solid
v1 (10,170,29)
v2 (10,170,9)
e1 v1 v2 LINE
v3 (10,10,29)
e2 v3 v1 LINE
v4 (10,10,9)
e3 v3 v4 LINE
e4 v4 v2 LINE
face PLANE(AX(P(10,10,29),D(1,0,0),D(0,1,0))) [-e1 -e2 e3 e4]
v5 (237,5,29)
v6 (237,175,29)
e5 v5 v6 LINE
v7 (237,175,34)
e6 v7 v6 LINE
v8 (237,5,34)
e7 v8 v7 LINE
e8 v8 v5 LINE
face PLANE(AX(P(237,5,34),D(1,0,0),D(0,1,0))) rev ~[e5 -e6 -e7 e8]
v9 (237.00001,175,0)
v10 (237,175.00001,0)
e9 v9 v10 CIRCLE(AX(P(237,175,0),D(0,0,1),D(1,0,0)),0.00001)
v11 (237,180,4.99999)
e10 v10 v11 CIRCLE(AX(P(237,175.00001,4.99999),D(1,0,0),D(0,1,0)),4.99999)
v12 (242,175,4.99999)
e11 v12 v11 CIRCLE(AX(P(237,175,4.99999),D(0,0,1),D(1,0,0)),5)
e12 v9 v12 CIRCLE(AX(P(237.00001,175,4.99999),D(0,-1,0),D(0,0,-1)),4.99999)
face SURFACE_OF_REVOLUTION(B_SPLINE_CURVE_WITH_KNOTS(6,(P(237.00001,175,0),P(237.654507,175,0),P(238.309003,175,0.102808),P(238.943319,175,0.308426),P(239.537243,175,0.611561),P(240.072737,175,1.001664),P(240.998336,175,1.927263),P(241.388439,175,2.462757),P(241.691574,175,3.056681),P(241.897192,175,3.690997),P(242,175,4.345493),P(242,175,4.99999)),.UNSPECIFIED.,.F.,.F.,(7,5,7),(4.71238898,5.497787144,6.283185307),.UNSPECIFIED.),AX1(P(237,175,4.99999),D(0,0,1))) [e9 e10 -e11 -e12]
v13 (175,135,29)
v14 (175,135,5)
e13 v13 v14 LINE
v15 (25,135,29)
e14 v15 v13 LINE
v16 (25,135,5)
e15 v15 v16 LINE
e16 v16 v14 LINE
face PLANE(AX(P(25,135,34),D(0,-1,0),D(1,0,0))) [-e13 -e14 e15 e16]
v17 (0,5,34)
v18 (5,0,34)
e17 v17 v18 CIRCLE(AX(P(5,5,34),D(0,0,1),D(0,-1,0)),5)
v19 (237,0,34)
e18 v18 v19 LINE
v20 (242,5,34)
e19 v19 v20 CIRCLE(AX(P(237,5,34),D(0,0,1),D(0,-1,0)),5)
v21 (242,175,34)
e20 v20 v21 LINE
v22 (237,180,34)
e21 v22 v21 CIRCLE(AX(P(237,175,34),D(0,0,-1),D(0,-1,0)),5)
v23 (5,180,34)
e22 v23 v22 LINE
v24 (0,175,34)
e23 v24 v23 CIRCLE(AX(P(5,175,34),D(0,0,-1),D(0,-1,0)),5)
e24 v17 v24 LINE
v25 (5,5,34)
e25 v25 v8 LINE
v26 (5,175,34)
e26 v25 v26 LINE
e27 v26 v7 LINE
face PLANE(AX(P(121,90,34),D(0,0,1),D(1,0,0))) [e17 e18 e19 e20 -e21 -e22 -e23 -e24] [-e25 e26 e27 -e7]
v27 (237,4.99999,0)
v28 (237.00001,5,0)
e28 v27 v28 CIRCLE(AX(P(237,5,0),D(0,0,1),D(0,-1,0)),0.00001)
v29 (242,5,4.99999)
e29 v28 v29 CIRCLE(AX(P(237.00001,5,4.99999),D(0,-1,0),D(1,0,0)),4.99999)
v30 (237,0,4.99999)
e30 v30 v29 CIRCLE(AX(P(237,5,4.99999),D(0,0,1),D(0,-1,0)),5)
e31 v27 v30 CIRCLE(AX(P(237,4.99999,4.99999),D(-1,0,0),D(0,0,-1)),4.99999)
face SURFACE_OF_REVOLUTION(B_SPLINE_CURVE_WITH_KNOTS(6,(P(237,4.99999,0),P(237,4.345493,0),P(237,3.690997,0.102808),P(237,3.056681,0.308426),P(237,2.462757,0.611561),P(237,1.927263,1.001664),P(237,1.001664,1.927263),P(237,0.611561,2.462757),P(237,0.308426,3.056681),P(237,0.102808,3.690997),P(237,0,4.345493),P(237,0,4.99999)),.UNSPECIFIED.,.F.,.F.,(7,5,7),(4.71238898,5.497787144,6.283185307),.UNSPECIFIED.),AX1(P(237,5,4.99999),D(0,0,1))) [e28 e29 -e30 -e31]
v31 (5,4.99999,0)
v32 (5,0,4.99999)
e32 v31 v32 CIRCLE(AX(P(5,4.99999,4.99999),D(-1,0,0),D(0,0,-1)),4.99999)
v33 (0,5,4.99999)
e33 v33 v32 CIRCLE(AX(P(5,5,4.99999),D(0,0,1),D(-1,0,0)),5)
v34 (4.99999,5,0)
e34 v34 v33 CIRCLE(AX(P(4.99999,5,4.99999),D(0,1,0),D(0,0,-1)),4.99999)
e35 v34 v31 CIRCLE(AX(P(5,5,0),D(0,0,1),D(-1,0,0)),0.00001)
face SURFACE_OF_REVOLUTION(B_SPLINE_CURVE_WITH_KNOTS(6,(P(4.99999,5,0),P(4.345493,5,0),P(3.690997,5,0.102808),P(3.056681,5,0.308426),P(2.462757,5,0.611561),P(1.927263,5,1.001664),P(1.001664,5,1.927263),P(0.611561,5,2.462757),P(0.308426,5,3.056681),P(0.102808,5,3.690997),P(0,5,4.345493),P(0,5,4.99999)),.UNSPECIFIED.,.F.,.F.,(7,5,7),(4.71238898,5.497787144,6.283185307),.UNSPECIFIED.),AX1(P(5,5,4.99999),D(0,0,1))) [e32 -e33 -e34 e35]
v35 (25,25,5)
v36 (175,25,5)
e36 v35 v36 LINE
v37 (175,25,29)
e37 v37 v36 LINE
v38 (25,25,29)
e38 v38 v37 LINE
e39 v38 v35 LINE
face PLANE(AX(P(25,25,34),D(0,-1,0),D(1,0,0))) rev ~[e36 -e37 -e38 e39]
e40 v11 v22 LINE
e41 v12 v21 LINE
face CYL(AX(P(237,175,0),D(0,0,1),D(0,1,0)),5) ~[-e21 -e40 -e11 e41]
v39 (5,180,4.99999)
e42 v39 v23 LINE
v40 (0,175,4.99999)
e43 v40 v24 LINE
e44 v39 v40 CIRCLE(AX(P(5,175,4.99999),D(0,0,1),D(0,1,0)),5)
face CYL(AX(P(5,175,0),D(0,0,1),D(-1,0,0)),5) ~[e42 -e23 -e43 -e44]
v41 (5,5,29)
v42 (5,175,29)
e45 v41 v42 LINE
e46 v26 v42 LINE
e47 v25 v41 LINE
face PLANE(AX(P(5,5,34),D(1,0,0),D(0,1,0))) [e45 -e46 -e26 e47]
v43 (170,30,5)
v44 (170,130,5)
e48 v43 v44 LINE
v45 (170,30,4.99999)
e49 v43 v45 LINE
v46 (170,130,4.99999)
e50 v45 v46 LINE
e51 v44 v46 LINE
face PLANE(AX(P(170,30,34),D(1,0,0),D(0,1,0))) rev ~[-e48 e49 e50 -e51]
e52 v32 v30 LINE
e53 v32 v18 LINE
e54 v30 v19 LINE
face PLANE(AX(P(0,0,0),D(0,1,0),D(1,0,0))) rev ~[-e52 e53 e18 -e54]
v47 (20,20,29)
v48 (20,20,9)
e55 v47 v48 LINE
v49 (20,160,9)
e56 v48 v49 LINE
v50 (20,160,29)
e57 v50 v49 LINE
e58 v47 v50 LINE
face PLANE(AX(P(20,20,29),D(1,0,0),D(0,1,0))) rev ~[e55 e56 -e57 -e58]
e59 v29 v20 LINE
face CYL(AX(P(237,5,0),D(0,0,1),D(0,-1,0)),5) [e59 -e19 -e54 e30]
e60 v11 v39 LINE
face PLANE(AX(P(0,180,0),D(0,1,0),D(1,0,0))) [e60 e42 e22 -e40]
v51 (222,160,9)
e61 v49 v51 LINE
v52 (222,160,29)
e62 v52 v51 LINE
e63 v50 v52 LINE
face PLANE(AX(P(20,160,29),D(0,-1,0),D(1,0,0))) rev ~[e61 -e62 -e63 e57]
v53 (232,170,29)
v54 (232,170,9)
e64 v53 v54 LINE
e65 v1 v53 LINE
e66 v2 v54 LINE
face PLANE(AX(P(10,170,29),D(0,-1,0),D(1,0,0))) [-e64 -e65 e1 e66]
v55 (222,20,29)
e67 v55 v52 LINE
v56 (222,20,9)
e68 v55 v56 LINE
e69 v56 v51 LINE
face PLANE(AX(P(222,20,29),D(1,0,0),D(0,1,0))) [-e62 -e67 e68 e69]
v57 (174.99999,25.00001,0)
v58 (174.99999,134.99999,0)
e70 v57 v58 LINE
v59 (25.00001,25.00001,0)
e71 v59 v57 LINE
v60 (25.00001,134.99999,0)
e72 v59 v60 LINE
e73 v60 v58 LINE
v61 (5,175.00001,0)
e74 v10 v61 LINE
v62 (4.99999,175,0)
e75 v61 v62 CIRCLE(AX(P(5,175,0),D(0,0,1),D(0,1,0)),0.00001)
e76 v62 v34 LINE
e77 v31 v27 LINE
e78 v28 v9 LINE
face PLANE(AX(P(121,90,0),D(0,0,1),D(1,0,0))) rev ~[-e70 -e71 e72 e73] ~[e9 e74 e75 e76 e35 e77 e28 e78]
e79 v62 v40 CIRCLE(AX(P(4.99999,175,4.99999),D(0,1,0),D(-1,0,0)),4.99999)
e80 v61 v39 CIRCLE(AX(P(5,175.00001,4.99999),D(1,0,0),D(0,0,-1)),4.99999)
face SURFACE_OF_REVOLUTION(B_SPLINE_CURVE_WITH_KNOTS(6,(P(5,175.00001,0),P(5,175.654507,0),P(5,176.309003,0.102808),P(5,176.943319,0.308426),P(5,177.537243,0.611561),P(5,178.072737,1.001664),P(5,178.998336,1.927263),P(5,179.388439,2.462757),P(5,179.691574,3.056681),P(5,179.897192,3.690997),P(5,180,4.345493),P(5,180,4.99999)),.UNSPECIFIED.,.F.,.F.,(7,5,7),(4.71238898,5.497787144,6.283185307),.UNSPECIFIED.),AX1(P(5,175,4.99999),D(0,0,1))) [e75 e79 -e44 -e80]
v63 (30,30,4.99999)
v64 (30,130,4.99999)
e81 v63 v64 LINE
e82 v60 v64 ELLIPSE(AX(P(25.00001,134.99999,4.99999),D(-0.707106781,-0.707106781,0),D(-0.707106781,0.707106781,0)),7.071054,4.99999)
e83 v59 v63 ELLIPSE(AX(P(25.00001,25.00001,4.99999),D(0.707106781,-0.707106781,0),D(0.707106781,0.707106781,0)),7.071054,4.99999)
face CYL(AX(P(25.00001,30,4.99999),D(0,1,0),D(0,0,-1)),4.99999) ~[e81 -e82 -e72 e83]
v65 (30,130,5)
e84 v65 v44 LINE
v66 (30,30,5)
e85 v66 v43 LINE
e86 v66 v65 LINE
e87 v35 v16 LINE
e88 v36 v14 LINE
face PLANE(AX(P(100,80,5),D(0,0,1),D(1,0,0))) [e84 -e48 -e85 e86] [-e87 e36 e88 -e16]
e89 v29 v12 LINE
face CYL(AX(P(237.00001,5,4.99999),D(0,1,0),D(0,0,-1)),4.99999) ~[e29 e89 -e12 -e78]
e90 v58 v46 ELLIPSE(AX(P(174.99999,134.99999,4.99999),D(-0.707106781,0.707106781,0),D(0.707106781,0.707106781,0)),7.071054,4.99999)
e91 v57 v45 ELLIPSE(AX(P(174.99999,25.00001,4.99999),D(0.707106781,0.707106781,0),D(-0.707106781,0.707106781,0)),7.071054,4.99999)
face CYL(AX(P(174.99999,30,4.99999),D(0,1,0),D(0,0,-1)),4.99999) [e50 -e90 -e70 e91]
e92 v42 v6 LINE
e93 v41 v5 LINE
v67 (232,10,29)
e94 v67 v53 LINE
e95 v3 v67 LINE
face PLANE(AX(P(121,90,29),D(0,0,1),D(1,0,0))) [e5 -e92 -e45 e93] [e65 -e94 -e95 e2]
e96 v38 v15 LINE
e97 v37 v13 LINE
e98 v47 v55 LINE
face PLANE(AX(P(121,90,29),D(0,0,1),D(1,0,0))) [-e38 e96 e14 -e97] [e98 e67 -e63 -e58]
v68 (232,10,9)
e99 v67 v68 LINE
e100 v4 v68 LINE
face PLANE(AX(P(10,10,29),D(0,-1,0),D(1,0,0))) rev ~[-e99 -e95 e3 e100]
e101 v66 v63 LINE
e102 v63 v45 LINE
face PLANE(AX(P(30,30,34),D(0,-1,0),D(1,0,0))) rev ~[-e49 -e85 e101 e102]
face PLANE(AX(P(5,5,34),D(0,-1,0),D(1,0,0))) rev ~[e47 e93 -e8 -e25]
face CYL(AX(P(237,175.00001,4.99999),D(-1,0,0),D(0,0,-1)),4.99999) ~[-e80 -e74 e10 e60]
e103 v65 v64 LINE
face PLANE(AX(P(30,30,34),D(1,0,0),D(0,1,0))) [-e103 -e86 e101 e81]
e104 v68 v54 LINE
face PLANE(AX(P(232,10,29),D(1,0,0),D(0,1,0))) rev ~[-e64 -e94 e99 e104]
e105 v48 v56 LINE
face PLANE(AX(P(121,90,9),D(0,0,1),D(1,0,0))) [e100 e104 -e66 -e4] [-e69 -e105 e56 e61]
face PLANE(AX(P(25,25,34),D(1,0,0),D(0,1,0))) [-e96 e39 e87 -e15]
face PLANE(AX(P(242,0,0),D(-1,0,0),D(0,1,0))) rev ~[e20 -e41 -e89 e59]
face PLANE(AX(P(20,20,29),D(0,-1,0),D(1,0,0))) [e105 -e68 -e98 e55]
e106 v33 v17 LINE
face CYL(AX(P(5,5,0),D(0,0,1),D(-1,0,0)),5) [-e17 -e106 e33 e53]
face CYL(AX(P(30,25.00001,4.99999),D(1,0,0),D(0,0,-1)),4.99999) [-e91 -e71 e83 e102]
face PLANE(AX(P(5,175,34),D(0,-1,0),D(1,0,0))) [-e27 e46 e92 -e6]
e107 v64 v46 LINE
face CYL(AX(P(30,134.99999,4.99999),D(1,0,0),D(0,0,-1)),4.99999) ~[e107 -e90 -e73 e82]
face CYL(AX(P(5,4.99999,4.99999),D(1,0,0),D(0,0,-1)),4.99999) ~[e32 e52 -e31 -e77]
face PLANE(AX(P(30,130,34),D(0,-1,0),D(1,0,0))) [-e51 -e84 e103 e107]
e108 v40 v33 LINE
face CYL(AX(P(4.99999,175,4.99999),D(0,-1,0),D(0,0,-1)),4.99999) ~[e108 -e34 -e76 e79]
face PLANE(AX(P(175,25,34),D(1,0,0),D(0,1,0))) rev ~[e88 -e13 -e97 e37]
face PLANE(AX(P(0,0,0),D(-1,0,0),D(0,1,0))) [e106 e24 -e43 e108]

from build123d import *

# Parameters (mm, degrees)
F0_W     = 242
F0_H     = 180
F1_DEPTH = 34
F2_W     = 140
F2_H     = 100
F3_DEPTH = 34.001
F4_W     = 150
F4_H     = 110
F4_W_2   = 140
F4_H_2   = 100
F5_DEPTH = 29
F6_W     = 232
F6_H     = 170
F6_W_2   = 150
F6_H_2   = 110
F7_DEPTH = 5
F8_W     = 222
F8_H     = 160
F8_W_2   = 202
F8_H_2   = 140
F9_DEPTH = 20
F10_R    = 5
F11_R    = 4.99999


# Not quite as in the source:
# - a fillet or chamfer is up to 0.001 mm smaller than in the source, because OpenCascade refuses the exact size


with BuildPart() as f1:
    # F0 (on Top) → F1 (new body)
    with BuildSketch(Plane.XY):
        with Locations((121, 90)):
            Rectangle(F0_W, F0_H)
    extrude(amount=F1_DEPTH)

    # F2 (on face) → F3 (cut, through all)
    with BuildSketch(Plane.XY.offset(34)):
        with Locations((100, 80)):
            Rectangle(F2_W, F2_H)
    extrude(amount=-F3_DEPTH, mode=Mode.SUBTRACT)

    # F4 (on face) → F5 (cut)
    with BuildSketch(Plane.XY.offset(34)):
        with Locations((100, 80)):
            Rectangle(F4_W, F4_H)
        with Locations((100, 80)):
            Rectangle(F4_W_2, F4_H_2, mode=Mode.SUBTRACT)
    extrude(amount=-F5_DEPTH, mode=Mode.SUBTRACT)

    # F6 (on face) → F7 (cut)
    with BuildSketch(Plane.XY.offset(34)):
        with Locations((121, 90)):
            Rectangle(F6_W, F6_H)
        with Locations((100, 80)):
            Rectangle(F6_W_2, F6_H_2, mode=Mode.SUBTRACT)
    extrude(amount=-F7_DEPTH, mode=Mode.SUBTRACT)

    # F8 (on face) → F9 (cut)
    with BuildSketch(Plane.XY.offset(29)):
        with Locations((121, 90)):
            Rectangle(F8_W, F8_H)
        with Locations((121, 90)):
            Rectangle(F8_W_2, F8_H_2, mode=Mode.SUBTRACT)
    extrude(amount=-F9_DEPTH, mode=Mode.SUBTRACT)

    # F10
    f10_edges = [f1.edges().sort_by_distance(p)[0] for p in [
        (242, 0, 17),
        (242, 180, 17),
        (0, 180, 17),
        (0, 0, 17),
    ]]
    fillet(f10_edges, radius=F10_R)

    # F11 (radius 5 in the source; OpenCascade refuses exactly that, so slightly less here)
    f11_edges = [f1.edges().sort_by_distance(p)[0] for p in [
        (121, 0, 0),
        (170, 80, 0),
        (100, 30, 0),
        (30, 80, 0),
        (100, 130, 0),
    ]]
    fillet(f11_edges, radius=F11_R)


solid = f1.part
